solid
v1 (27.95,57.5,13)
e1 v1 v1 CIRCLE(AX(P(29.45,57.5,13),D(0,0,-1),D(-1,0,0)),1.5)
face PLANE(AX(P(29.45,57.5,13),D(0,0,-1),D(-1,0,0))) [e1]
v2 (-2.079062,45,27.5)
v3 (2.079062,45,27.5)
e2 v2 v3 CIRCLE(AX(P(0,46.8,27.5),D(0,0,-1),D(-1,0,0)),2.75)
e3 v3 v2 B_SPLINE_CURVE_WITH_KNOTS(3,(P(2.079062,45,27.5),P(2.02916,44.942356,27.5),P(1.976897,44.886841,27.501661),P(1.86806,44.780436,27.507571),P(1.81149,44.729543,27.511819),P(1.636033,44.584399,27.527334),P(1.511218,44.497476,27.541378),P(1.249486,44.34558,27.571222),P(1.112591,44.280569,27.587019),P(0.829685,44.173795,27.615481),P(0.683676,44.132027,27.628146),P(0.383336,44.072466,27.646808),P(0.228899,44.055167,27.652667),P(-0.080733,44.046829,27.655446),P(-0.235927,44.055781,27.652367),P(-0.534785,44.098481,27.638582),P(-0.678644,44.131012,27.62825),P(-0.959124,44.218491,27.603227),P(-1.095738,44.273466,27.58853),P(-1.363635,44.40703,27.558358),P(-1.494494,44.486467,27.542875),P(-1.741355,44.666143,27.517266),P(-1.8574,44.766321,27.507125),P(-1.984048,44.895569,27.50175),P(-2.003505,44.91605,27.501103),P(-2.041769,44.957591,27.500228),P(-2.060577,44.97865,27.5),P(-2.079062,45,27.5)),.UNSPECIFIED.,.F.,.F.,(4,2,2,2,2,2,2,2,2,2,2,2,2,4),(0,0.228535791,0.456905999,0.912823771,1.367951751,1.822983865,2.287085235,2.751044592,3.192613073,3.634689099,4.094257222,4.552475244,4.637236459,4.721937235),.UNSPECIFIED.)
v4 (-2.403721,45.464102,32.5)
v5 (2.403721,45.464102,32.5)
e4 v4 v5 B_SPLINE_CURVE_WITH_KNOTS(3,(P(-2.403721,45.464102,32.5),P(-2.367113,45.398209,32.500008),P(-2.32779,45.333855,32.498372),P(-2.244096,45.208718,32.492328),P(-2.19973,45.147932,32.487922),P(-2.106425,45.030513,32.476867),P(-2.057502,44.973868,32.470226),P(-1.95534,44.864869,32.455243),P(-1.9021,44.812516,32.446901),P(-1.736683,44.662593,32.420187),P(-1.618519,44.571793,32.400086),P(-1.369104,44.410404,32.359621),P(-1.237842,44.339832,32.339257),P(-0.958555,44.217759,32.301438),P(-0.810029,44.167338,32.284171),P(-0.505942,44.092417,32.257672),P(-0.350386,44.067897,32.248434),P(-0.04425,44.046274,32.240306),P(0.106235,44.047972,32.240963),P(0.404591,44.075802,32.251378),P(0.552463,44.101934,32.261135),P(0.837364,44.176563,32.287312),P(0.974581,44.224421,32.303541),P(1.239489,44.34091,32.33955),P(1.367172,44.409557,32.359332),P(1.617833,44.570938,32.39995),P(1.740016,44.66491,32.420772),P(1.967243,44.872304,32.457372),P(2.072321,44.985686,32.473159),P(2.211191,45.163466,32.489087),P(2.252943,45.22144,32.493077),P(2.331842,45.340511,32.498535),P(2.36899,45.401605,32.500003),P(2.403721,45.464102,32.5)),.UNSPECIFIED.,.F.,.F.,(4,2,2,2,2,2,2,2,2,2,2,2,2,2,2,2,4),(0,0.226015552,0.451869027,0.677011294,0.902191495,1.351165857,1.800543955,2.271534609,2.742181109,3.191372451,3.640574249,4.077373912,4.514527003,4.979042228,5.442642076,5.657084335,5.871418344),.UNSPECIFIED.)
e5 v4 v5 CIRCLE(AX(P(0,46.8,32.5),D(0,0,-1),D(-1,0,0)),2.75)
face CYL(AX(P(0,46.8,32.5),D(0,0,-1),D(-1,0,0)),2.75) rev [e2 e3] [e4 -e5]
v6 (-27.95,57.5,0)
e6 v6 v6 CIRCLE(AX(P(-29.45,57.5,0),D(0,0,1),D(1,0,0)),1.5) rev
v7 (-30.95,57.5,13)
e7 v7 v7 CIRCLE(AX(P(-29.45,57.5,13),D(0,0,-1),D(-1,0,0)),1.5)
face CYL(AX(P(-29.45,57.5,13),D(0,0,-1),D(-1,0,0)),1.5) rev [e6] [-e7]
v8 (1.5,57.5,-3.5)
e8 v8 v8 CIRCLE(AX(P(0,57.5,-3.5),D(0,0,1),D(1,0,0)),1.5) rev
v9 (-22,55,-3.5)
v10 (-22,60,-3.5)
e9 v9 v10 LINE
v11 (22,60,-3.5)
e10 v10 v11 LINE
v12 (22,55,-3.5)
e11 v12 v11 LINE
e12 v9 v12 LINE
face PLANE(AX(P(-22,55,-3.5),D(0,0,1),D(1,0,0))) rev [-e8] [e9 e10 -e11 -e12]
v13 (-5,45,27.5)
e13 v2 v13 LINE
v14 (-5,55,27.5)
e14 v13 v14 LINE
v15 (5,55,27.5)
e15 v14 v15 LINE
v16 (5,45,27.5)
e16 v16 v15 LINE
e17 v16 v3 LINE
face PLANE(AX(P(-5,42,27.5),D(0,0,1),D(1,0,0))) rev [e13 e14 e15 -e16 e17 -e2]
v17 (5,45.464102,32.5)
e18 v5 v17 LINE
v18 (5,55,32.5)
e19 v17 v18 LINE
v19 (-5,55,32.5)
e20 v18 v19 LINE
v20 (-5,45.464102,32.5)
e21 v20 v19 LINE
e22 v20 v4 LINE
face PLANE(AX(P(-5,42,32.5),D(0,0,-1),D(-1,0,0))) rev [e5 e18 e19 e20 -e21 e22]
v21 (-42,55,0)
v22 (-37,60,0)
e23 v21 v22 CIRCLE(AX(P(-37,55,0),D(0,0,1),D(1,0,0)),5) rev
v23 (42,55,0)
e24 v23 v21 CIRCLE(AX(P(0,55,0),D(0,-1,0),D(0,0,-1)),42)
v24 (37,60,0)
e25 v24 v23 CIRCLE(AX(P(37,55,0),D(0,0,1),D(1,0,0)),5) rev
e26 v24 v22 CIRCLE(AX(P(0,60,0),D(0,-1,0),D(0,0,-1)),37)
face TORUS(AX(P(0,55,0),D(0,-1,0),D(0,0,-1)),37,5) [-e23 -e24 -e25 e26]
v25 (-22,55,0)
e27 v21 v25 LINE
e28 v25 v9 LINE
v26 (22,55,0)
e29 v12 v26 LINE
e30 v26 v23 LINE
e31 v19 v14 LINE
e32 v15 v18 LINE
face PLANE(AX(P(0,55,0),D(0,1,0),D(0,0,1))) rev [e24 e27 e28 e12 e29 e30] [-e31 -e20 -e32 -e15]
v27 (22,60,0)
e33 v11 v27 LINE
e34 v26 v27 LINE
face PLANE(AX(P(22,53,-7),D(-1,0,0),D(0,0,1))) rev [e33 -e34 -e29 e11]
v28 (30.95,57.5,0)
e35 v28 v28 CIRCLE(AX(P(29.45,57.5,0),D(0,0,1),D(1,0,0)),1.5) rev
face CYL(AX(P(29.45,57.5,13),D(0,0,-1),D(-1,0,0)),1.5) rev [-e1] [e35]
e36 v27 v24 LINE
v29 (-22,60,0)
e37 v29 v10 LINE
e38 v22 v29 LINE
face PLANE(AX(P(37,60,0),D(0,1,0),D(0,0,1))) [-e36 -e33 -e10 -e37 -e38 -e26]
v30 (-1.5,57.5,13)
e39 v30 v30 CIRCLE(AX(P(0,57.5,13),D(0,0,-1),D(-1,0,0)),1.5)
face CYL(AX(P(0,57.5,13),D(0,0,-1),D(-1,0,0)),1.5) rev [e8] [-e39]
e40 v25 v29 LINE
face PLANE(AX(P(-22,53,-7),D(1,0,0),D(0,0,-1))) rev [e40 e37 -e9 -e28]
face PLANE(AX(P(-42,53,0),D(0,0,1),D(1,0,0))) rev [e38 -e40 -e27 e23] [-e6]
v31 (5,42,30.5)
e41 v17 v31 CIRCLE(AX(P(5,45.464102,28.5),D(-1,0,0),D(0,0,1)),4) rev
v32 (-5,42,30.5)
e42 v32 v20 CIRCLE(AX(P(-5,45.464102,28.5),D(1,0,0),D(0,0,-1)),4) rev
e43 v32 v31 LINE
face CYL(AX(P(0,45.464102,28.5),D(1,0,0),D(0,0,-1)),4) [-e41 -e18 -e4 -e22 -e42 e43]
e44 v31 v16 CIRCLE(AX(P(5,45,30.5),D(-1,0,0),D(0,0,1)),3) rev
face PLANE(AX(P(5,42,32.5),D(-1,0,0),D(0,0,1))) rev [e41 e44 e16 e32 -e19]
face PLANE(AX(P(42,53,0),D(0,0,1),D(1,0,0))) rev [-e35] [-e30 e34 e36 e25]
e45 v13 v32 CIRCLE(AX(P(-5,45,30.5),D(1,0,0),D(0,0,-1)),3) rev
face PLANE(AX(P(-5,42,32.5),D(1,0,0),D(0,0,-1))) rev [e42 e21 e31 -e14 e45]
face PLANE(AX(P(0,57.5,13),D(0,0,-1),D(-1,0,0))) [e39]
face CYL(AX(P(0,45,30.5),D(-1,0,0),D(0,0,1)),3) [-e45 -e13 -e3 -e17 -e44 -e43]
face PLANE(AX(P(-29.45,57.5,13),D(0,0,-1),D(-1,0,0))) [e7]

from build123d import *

# Parameters (mm, degrees)
CUT_EXTRUDE1_DEPTH   = 5
CUT_EXTRUDE3_DEPTH   = 45
SKETCH8_R            = 40
CUT_EXTRUDE4_DEPTH   = 32
SKETCH9_R            = 32
SKETCH9_R_2          = 24.5
CUT_EXTRUDE5_DEPTH   = 14
SKETCH10_R           = 26
CUT_EXTRUDE6_DEPTH   = 14
FILLET1_R            = 7
FILLET2_R            = 7
CUT_REVOLVE1_START   = 22
CUT_REVOLVE1_DEPTH   = 30.5
CUT_EXTRUDE12_DEPTH  = 5
SKETCH18_W           = 13
SKETCH18_H           = 8
CUT_EXTRUDE13_DEPTH  = 5
INTERSECT1_OUTLINE_R = 42
INTERSECT1_DEPTH     = 55
SKETCH20_W           = 10
SKETCH20_H           = 5
BOSS_EXTRUDE1_DEPTH  = 13
BOSS_EXTRUDE3_DEPTH  = 7
SKETCH19_R           = 1.5
CUT_EXTRUDE14_DEPTH  = 20
SKETCH23_W           = 20
SKETCH23_H           = 7
CUT_EXTRUDE15_DEPTH  = 7
SKETCH24_W           = 44
SKETCH24_H           = 3.5
CUT_EXTRUDE16_DEPTH  = 5
SKETCH25_R           = 2.75
CUT_EXTRUDE17_DEPTH  = 5
FILLET4_R            = 3
FILLET6_R            = 4


with BuildPart() as part:
    # Sketch1 → Revolve1 (revolve)
    with BuildSketch(Plane.XY, mode=Mode.PRIVATE) as revolve1_sk:
        with BuildLine():
            Line((22.5, 0), (32, 0))
            ThreePointArc((32, 0), (33.414213562, 0.585786438), (34, 2))
            Line((34, 2), (34, 18))
            Line((34, 18), (40, 18))
            ThreePointArc((40, 18), (41.414213562, 18.585786438), (42, 20))
            Line((42, 20), (42, 55))
            ThreePointArc((42, 55), (40.535533906, 58.535533906), (37, 60))
            Line((37, 60), (0, 60))
            Line((0, 60), (0, 18))
            Line((0, 18), (22.5, 18))
            Line((22.5, 18), (22.5, 0))
        make_face()
    revolve(revolve1_sk.sketch.rotate(Axis((0, 2, 0), (0, 1, 0)), 90), axis=Axis((0, 2, 0), (0, 1, 0)))

    # Sketch5 → Cut-Extrude1 (cut)
    with BuildSketch(Plane(origin=(0, 60, 0), x_dir=(1, 0, 0), z_dir=(0, 1, 0))):
        with BuildLine():
            Line((-42, 0), (-40, 0))
            Line((-40, 0), (40, 0))
            Line((40, 0), (42, 0))
            ThreePointArc((42, 0), (0, 42), (-42, 0))
        make_face()
    extrude(amount=-CUT_EXTRUDE1_DEPTH, mode=Mode.SUBTRACT)

    # Sketch7 → Cut-Extrude3 (cut)
    with BuildSketch(Plane.XZ.offset(-18)):
        with BuildLine():
            Line((-21, 0), (21, 0))
            ThreePointArc((21, 0), (0, -21), (-21, 0))
        make_face()
    extrude(amount=-CUT_EXTRUDE3_DEPTH, mode=Mode.SUBTRACT)

    # Sketch8 → Cut-Extrude4 (cut)
    with BuildSketch(Plane(origin=(0, 52.5, 0), x_dir=(1, 0, 0), z_dir=(0, 1, 0))):
        with Locations(Location((0, 0, 0), (0, 0, 270))):
            Circle(SKETCH8_R)
        with BuildLine():
            Line((22.912878475, -2), (-22.912878475, -2))
            ThreePointArc((-22.912878475, -2), (0, 23), (22.912878475, -2))
        make_face(mode=Mode.SUBTRACT)
    extrude(amount=-CUT_EXTRUDE4_DEPTH, mode=Mode.SUBTRACT)

    # Sketch9 → Cut-Extrude5 (cut)
    with BuildSketch(Plane(origin=(0, 2, 0), x_dir=(-1, 0, 0), z_dir=(0, -1, 0))):
        with Locations(Location((0, 0, 0), (0, 0, 90))):
            Circle(SKETCH9_R)
        with Locations(Location((0, 0, 0), (0, 0, 90))):
            Circle(SKETCH9_R_2, mode=Mode.SUBTRACT)
    extrude(amount=-CUT_EXTRUDE5_DEPTH, mode=Mode.SUBTRACT)

    # Sketch10 → Cut-Extrude6 (cut)
    with BuildSketch(Plane(origin=(0, 2, 0), x_dir=(-1, 0, 0), z_dir=(0, -1, 0))):
        Circle(SKETCH10_R)
    extrude(amount=-CUT_EXTRUDE6_DEPTH, mode=Mode.SUBTRACT)

    # Fillet1
    fillet1_edges = [part.edges().sort_by_distance(p)[0] for p in [
        (21, 36.5, 0),
        (-21, 36.5, 0),
    ]]
    fillet(fillet1_edges, radius=FILLET1_R)

    # Fillet2
    fillet2_edges = [part.edges().sort_by_distance(p)[0] for p in [
        (-22.912878475, 36.5, 2),
        (22.912878475, 36.5, 2),
    ]]
    fillet(fillet2_edges, radius=FILLET2_R)

    # Cut-Revolve1: read off the stored shape, not the designer's step
    # Cut-Revolve1 outline → Cut-Revolve1 (cut)
    with BuildSketch(Plane(origin=(0, 0, 0), x_dir=(1, 0, 0), z_dir=(0, 1, 0)).offset(CUT_REVOLVE1_START)):
        with BuildLine():
            Line((-34.641016151, -20), (-36.373066959, -21))
            ThreePointArc((-36.373066959, -21), (0, -42), (36.373066959, -21))
            Line((36.373066959, -21), (34.641016151, -20))
            ThreePointArc((34.641016151, -20), (0, -40), (-34.641016151, -20))
        make_face()
    extrude(amount=CUT_REVOLVE1_DEPTH, mode=Mode.SUBTRACT)

    # Sketch15 → Cut-Extrude12 (cut)
    with BuildSketch(Plane(origin=(0, 20.5, 0), x_dir=(1, 0, 0), z_dir=(0, 1, 0))):
        with BuildLine():
            Line((-28.124355653, -3.514579578), (-26.124355653, -3.514579578))
            ThreePointArc((-26.124355653, -3.514579578), (-24.710142091, -2.928793141), (-24.124355653, -1.514579578))
            Line((-24.124355653, -1.514579578), (-24.124355653, 8.485420422))
            ThreePointArc((-24.124355653, 8.485420422), (-24.710142091, 9.899633984), (-26.124355653, 10.485420422))
            Line((-26.124355653, 10.485420422), (-28.124355653, 10.485420422))
            ThreePointArc((-28.124355653, 10.485420422), (-29.538569215, 9.899633984), (-30.124355653, 8.485420422))
            Line((-30.124355653, 8.485420422), (-30.124355653, -1.514579578))
            ThreePointArc((-30.124355653, -1.514579578), (-29.538569215, -2.928793141), (-28.124355653, -3.514579578))
        make_face()
    extrude(amount=-CUT_EXTRUDE12_DEPTH, mode=Mode.SUBTRACT)

    # Sketch18 → Cut-Extrude13 (cut)
    with BuildSketch(Plane(origin=(0, 55, 0), x_dir=(1, 0, 0), z_dir=(0, 1, 0))):
        with Locations((0.796512215, 32.951769165)):
            Rectangle(SKETCH18_W, SKETCH18_H)
    extrude(amount=-CUT_EXTRUDE13_DEPTH, mode=Mode.SUBTRACT)

    # Intersect1: read off the stored shape, not the designer's step
    # Intersect1 outline → Intersect1 (cut)
    with BuildSketch(Plane(origin=(0, 0, 0), x_dir=(1, 0, 0), z_dir=(0, 1, 0))):
        Circle(INTERSECT1_OUTLINE_R)
        with BuildLine():
            Line((12.124355653, 0), (-12.124355653, 0))
            ThreePointArc((-12.124355653, 0), (-18.186533479, 3.5), (-18.186533479, 10.5))
            ThreePointArc((-18.186533479, 10.5), (0, 21), (18.186533479, 10.5))
            ThreePointArc((18.186533479, 10.5), (18.186533479, 3.5), (12.124355653, 0))
        make_face(mode=Mode.SUBTRACT)
    extrude(amount=INTERSECT1_DEPTH, mode=Mode.SUBTRACT)

    # Sketch20 → Boss-Extrude1 (add)
    with BuildSketch(Plane.XZ.offset(-55)):
        with Locations((0, 30)):
            Rectangle(SKETCH20_W, SKETCH20_H)
    extrude(amount=BOSS_EXTRUDE1_DEPTH)

    # Sketch22 → Boss-Extrude3 (add)
    with BuildSketch(Plane(origin=(0, 0, 0), x_dir=(-1, 0, 0), z_dir=(0, 0, -1))):
        with BuildLine():
            Line((-42, 55), (42, 55))
            ThreePointArc((42, 55), (40.535533906, 58.535533906), (37, 60))
            Line((37, 60), (-37, 60))
            ThreePointArc((-37, 60), (-40.535533906, 58.535533906), (-42, 55))
        make_face()
    extrude(amount=BOSS_EXTRUDE3_DEPTH)

    # Sketch19 → Cut-Extrude14 (cut)
    with BuildSketch(Plane(origin=(0, 0, -7), x_dir=(-1, 0, 0), z_dir=(0, 0, -1))):
        with Locations((0, 57.5)):
            Circle(SKETCH19_R)
        with Locations((-29.45, 57.5)):
            Circle(SKETCH19_R)
        with Locations((29.45, 57.5)):
            Circle(SKETCH19_R)
    extrude(amount=-CUT_EXTRUDE14_DEPTH, mode=Mode.SUBTRACT)

    # Sketch23 → Cut-Extrude15 (cut)
    with BuildSketch(Plane(origin=(0, 60, 0), x_dir=(1, 0, 0), z_dir=(0, 1, 0))):
        with Locations((-32, 3.5)):
            Rectangle(SKETCH23_W, SKETCH23_H)
        with Locations((32, 3.5)):
            Rectangle(SKETCH23_W, SKETCH23_H)
    extrude(amount=-CUT_EXTRUDE15_DEPTH, mode=Mode.SUBTRACT)

    # Sketch24 → Cut-Extrude16 (cut)
    with BuildSketch(Plane(origin=(0, 60, 0), x_dir=(1, 0, 0), z_dir=(0, 1, 0))):
        with Locations((0, 5.25)):
            Rectangle(SKETCH24_W, SKETCH24_H)
    extrude(amount=-CUT_EXTRUDE16_DEPTH, mode=Mode.SUBTRACT)

    # Sketch25 → Cut-Extrude17 (cut)
    with BuildSketch(Plane(origin=(0, 0, 27.5), x_dir=(-1, 0, 0), z_dir=(0, 0, -1))):
        with Locations((0, 46.8)):
            Circle(SKETCH25_R)
    extrude(amount=-CUT_EXTRUDE17_DEPTH, mode=Mode.SUBTRACT)

    # Fillet4
    # the kernel refuses this fillet: 3 mm, written as the material it takes off along each edge
    with BuildSketch(Plane(origin=(12.5, 42, 27.5), x_dir=(0, 1, 0), z_dir=(-1, 0, 0))) as fillet4_piece_1:
        with BuildLine():
            CenterArc((FILLET4_R, -FILLET4_R), FILLET4_R, 90, 90)
            Line((0, -FILLET4_R), (0, 0))
            Line((0, 0), (FILLET4_R, 0))
        make_face()
    extrude(amount=25, mode=Mode.SUBTRACT)

    # Fillet6
    # the kernel refuses this fillet: 4 mm, written as the material it takes off along each edge
    with BuildSketch(Plane(origin=(-13.660254038, 42, 32.5), x_dir=(0, 1, 0), z_dir=(1, 0, 0))) as fillet6_piece_1:
        with BuildLine():
            CenterArc((3.464101615, -4), FILLET6_R, 90, 60)
            Line((0, -2), (0, 0))
            Line((0, 0), (3.464101615, 0))
        make_face()
    extrude(amount=27.320508076, mode=Mode.SUBTRACT)


solid = part.part
